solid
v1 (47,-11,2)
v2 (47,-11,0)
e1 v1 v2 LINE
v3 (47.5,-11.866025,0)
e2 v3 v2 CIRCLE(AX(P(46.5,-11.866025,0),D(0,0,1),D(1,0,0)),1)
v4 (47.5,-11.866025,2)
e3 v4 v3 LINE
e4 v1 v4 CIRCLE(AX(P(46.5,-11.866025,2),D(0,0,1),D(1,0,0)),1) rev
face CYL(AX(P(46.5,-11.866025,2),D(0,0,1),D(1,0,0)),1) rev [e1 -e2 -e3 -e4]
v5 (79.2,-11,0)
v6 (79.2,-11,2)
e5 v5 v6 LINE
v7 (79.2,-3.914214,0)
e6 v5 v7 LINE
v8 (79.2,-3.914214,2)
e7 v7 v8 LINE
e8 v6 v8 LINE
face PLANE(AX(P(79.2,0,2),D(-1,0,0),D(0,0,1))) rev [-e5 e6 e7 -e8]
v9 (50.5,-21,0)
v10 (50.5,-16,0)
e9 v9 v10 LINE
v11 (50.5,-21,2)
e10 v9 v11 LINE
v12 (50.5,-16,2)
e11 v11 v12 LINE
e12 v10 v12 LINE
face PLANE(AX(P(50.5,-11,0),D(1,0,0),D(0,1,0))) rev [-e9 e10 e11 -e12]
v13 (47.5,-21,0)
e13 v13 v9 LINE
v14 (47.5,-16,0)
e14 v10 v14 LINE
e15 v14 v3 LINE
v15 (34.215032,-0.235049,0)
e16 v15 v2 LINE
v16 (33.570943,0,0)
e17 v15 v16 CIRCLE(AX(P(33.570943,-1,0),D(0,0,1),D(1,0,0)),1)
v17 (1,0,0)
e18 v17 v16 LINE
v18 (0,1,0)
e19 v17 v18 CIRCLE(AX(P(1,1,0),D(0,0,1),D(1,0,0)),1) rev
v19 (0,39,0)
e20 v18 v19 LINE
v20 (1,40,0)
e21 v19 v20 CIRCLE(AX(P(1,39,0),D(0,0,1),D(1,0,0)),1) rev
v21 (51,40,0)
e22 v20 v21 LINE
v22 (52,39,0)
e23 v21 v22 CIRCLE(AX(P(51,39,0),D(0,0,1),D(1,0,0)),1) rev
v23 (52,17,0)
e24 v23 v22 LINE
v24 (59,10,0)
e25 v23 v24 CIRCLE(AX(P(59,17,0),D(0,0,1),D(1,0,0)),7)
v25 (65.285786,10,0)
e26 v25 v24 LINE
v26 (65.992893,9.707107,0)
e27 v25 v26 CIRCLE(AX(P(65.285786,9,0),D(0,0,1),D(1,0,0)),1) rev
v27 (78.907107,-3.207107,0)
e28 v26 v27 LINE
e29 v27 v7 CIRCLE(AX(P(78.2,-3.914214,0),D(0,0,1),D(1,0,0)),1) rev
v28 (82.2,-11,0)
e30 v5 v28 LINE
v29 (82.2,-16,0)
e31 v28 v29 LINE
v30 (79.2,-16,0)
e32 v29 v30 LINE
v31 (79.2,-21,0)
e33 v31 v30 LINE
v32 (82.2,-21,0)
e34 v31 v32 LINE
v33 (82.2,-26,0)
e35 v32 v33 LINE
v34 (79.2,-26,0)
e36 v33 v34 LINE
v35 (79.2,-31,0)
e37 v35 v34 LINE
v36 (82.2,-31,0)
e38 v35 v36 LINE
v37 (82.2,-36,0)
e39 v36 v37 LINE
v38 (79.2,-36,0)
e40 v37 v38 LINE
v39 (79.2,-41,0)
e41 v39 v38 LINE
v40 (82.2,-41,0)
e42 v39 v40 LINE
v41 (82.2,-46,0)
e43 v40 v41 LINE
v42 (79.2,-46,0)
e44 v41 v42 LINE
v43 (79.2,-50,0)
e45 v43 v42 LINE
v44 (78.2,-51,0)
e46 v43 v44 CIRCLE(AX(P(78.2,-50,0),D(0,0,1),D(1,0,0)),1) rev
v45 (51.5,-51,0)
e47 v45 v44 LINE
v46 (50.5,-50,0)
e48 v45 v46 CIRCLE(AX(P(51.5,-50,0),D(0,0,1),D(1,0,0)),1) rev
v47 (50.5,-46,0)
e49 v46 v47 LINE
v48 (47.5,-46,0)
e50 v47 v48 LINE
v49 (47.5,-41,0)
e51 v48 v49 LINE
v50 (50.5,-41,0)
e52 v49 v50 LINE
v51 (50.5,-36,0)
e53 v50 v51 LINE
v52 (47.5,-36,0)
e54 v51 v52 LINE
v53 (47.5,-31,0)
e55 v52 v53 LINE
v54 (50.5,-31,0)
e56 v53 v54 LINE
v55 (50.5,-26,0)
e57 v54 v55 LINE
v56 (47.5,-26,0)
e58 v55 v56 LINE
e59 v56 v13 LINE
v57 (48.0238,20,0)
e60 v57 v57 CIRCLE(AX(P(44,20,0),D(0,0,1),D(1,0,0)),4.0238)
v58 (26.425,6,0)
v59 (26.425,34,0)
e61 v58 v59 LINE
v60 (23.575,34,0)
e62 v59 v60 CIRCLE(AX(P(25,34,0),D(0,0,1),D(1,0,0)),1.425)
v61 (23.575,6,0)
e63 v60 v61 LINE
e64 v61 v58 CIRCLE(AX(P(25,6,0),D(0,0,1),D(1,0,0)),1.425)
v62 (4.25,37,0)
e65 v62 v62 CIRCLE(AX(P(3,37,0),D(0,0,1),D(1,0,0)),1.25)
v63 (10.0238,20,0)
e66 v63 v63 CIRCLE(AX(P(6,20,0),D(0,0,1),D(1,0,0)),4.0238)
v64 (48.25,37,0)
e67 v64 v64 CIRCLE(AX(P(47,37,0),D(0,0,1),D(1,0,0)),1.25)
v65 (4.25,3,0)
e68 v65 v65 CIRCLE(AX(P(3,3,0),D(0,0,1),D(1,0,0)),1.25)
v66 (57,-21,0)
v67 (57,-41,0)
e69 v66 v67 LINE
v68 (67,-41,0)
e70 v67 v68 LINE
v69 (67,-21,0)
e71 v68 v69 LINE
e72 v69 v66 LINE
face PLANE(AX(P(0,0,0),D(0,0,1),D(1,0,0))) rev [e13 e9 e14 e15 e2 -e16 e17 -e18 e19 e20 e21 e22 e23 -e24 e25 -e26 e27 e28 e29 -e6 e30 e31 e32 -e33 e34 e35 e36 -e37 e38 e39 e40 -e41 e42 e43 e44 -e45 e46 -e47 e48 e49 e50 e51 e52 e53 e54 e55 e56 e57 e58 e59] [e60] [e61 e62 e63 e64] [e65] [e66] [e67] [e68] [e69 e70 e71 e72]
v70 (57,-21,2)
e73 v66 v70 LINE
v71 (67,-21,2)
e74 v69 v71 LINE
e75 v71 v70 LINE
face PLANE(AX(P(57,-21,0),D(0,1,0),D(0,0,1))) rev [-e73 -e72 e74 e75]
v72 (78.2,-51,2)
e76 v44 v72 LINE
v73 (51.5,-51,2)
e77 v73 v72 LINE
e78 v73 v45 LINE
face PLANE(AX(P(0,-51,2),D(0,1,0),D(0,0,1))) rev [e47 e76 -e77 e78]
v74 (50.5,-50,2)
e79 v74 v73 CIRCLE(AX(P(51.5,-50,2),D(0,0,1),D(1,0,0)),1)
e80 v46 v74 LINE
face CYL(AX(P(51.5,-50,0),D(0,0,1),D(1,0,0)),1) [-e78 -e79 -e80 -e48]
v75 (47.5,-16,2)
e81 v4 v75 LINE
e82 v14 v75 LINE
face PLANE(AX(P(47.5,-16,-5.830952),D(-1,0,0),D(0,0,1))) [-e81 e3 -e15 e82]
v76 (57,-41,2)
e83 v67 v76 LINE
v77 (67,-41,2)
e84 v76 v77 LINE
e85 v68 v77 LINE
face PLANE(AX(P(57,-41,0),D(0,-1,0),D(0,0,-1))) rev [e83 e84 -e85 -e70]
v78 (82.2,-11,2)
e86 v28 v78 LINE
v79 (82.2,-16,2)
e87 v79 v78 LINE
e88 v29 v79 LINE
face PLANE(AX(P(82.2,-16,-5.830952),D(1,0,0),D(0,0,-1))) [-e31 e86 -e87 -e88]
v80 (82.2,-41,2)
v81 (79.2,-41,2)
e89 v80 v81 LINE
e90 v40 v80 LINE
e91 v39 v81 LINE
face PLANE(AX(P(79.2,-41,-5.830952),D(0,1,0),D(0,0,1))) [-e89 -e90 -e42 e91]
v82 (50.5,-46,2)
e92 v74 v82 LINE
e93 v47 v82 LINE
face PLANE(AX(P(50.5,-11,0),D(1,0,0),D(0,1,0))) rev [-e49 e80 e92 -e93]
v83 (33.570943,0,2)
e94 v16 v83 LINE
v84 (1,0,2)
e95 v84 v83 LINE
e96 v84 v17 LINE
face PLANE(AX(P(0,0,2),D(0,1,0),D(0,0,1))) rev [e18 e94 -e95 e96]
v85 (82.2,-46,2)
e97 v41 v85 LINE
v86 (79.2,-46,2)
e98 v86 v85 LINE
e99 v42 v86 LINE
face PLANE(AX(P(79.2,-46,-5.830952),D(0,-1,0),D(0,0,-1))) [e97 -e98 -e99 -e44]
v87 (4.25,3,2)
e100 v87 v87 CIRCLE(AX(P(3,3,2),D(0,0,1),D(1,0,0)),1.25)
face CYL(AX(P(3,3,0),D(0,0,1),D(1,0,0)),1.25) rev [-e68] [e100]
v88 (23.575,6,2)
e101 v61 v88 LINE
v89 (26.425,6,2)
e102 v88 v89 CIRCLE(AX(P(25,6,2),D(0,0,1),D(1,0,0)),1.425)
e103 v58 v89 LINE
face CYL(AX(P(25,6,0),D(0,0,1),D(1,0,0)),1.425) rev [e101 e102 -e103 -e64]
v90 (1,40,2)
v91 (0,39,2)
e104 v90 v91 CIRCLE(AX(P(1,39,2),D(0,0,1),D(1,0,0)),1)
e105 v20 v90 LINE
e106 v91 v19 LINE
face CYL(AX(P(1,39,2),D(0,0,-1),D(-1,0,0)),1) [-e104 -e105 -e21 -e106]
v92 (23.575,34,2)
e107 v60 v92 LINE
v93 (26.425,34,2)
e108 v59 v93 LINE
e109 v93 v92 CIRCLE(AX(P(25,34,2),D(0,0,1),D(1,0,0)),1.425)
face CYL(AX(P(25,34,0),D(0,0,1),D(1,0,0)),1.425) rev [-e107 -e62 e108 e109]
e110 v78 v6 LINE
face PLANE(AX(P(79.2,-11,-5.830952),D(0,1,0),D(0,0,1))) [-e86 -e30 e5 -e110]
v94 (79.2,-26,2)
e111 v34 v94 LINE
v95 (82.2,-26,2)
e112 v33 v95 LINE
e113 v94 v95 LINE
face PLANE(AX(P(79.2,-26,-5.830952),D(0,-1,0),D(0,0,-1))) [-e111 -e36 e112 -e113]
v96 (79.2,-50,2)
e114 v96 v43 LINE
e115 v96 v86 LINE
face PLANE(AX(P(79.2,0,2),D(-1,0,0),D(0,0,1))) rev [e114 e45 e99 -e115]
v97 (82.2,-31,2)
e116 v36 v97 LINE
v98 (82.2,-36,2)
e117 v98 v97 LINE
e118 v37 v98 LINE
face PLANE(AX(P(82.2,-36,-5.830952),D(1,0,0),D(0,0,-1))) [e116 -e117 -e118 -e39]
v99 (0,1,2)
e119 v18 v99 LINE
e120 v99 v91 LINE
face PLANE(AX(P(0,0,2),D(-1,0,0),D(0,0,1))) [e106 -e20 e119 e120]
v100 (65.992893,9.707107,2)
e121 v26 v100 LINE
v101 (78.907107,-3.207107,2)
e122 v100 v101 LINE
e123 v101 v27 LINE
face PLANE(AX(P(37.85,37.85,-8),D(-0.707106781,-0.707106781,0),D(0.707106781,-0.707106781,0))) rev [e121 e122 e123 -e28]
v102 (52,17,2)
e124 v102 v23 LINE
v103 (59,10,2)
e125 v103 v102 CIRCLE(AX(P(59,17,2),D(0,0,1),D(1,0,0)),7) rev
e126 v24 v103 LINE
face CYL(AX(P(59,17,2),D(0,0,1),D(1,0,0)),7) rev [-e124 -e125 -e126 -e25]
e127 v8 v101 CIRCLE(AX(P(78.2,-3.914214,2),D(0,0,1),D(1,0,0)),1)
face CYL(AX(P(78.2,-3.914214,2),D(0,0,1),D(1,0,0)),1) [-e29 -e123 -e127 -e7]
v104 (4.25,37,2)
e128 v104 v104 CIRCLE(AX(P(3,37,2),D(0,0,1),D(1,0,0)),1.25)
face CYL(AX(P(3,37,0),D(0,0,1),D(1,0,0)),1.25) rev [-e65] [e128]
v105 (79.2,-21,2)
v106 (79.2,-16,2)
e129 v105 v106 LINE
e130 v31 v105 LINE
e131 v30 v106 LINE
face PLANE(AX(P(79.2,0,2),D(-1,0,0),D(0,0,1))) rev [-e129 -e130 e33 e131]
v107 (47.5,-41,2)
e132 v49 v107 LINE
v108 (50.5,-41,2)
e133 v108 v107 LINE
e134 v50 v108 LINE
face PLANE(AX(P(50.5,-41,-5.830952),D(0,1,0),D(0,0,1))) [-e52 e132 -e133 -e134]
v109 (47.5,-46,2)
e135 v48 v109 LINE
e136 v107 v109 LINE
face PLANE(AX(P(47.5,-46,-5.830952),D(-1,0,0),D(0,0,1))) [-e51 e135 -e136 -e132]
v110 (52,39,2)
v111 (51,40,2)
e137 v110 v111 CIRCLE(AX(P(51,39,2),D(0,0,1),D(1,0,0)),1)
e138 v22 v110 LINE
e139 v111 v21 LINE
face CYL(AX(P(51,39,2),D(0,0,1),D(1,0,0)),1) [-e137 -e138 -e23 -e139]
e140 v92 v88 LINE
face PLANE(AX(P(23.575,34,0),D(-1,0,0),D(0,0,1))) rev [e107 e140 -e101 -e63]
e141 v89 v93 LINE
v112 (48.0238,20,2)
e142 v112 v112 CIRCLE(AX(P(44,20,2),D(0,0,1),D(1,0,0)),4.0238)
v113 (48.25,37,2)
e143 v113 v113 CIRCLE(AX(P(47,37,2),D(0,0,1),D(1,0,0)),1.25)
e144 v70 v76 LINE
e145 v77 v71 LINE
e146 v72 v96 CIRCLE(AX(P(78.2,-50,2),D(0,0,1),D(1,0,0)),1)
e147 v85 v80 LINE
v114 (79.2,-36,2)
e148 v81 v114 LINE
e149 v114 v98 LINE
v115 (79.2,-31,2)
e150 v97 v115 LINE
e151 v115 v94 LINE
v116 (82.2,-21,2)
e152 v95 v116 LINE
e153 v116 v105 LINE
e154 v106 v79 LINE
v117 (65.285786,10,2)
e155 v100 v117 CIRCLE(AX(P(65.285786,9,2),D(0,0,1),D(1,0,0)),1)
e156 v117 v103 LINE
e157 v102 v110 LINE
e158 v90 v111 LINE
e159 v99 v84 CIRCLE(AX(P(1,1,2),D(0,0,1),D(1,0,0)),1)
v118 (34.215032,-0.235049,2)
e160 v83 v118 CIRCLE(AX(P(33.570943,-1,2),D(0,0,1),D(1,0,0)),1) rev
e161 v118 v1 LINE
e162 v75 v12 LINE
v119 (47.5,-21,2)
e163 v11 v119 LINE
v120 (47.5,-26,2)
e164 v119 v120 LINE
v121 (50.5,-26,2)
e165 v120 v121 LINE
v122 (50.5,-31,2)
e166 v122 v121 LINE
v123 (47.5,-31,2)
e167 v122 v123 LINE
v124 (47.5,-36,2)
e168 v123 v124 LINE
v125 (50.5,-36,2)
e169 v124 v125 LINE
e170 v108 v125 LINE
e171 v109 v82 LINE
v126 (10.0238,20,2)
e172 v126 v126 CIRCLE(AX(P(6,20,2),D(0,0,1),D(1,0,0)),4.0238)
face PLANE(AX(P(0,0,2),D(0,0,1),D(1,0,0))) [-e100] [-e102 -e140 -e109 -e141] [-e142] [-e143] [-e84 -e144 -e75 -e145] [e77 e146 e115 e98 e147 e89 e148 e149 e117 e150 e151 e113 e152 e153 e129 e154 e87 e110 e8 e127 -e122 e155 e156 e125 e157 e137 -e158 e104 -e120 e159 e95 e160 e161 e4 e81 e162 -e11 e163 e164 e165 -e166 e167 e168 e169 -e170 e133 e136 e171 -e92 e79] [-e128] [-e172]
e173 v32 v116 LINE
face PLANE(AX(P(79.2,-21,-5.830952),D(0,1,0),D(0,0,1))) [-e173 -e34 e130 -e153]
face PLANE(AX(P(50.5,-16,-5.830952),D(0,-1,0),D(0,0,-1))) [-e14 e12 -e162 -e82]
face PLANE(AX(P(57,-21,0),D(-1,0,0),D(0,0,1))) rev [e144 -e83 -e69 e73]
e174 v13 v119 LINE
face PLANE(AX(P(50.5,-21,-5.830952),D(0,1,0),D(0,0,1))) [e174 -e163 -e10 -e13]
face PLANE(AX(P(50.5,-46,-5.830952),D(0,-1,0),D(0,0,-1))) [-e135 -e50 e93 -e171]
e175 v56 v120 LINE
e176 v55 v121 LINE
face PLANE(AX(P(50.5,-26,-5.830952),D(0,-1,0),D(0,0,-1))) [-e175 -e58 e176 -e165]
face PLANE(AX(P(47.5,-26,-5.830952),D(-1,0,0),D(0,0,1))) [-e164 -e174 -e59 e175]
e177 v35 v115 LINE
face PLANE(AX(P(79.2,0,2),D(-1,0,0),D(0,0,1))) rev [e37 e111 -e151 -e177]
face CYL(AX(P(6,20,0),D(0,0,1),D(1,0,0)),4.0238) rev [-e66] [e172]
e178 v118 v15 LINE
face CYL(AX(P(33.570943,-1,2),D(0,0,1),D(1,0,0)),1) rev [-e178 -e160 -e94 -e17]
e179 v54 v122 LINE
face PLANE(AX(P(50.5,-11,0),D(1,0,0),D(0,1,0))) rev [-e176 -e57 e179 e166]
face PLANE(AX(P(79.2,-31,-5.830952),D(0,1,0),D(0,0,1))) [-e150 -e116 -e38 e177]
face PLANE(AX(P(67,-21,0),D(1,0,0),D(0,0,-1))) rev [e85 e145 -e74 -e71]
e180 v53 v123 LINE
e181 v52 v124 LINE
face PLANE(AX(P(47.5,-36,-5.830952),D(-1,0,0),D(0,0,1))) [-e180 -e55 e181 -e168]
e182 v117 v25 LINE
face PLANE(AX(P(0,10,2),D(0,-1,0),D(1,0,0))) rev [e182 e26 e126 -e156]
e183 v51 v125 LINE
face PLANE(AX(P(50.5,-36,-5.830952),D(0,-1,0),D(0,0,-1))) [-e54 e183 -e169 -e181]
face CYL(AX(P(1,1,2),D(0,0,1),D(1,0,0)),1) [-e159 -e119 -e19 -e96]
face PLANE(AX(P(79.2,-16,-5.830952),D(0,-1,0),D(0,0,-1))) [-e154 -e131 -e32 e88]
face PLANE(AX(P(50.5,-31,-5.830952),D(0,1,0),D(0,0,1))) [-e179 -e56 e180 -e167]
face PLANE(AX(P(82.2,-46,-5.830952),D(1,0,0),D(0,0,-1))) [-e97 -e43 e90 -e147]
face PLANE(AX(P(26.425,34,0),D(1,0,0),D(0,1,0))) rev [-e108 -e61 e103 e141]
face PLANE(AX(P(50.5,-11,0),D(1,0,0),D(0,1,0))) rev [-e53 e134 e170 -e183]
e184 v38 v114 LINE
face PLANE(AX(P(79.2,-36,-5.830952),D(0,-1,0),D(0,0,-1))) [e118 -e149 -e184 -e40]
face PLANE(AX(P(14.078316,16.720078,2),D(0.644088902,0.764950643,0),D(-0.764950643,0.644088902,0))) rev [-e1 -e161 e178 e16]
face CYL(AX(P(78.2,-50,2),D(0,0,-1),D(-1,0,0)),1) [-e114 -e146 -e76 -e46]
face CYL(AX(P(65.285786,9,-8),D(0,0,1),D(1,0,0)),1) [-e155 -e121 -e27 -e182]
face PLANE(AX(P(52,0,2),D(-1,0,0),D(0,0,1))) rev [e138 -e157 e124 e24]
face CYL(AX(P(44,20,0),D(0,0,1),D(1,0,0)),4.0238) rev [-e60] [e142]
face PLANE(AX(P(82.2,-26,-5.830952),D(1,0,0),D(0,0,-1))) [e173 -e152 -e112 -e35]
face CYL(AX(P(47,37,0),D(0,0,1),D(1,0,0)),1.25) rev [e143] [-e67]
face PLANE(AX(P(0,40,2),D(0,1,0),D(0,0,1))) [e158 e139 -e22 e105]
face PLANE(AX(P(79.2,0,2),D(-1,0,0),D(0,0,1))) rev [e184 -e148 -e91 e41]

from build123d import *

# Parameters (mm, degrees)
PLATE_BODY_DEPTH          = 2
SKETCH2_R                 = 4.0238
SHAFT_BEARINGS_DEPTH      = 95.22122903
SLOT_DEPTH                = 95.22122903
SKETCH5_R                 = 1.25
BOLT_HOLES_DEPTH          = 95.22122903
SKETCH6_W                 = 0.5
SKETCH6_H                 = 40
CUT_EXTRUDE1_DEPTH        = 95.22122903
SKETCH8_W                 = 3
SKETCH8_H                 = 5
FINGER_JOINTS_DEPTH       = 2
SKETCH9_W                 = 10
SKETCH9_H                 = 20
GEAR_HOLE_DEPTH           = 97.756601842
CUT_EXTRUDE3_DEPTH        = 10
F_1MM_FILLETS_GEAR_HOLE_R = 1
F_7MM_FILLET_GEAR_HOLE_R  = 7


with BuildPart() as part:
    # Sketch1 → plate_body (new body)
    with BuildSketch(Plane.XY):
        Polygon((0, 40), (0, 0), (33.935876329, 0), (47, -11), (50, -11), (50, -51), (79.2, -51), (79.2, 10), (52, 10), (52, 40), align=None)
    extrude(amount=PLATE_BODY_DEPTH)

    # Sketch2 → shaft_bearings (cut, through all)
    with BuildSketch(Plane.XY.offset(2)):
        with Locations((6, 20)):
            Circle(SKETCH2_R)
        with Locations((44, 20)):
            Circle(SKETCH2_R)
    extrude(amount=-SHAFT_BEARINGS_DEPTH, mode=Mode.SUBTRACT)

    # Sketch4 → slot (cut, through all)
    with BuildSketch(Plane.XY.offset(2)):
        with BuildLine():
            Line((26.425, 34), (26.425, 6))
            ThreePointArc((26.425, 6), (25, 4.575), (23.575, 6))
            Line((23.575, 6), (23.575, 34))
            ThreePointArc((23.575, 34), (25, 35.425), (26.425, 34))
        make_face()
    extrude(amount=-SLOT_DEPTH, mode=Mode.SUBTRACT)

    # Sketch5 → bolt_holes (cut, through all)
    with BuildSketch(Plane.XY.offset(2)):
        with Locations((3, 37)):
            Circle(SKETCH5_R)
        with Locations((47, 37)):
            Circle(SKETCH5_R)
        with Locations((3, 3)):
            Circle(SKETCH5_R)
    extrude(amount=-BOLT_HOLES_DEPTH, mode=Mode.SUBTRACT)

    # Sketch6 → Cut-Extrude1 (cut, through all)
    with BuildSketch(Plane.XY.offset(2)):
        with Locations((50.25, -31)):
            Rectangle(SKETCH6_W, SKETCH6_H)
    extrude(amount=-CUT_EXTRUDE1_DEPTH, mode=Mode.SUBTRACT)

    # Sketch8 → finger_joints (add)
    with BuildSketch(Plane.XY.offset(2)):
        with Locations((49, -33.5)):
            Rectangle(SKETCH8_W, SKETCH8_H)
        with Locations((49, -43.5)):
            Rectangle(SKETCH8_W, SKETCH8_H)
        with Locations((80.7, -43.5)):
            Rectangle(SKETCH8_W, SKETCH8_H)
        with Locations((80.7, -33.5)):
            Rectangle(SKETCH8_W, SKETCH8_H)
        with Locations((49, -13.5)):
            Rectangle(SKETCH8_W, SKETCH8_H)
        with Locations((49, -23.5)):
            Rectangle(SKETCH8_W, SKETCH8_H)
        with Locations((80.7, -23.5)):
            Rectangle(SKETCH8_W, SKETCH8_H)
        with Locations((80.7, -13.5)):
            Rectangle(SKETCH8_W, SKETCH8_H)
    extrude(amount=-FINGER_JOINTS_DEPTH)

    # Sketch9 → gear_hole (cut, through all)
    with BuildSketch(Plane.XY.offset(2)):
        with Locations((62, -31)):
            Rectangle(SKETCH9_W, SKETCH9_H)
    extrude(amount=-GEAR_HOLE_DEPTH, mode=Mode.SUBTRACT)

    # Sketch12 → Cut-Extrude3 (cut)
    with BuildSketch(Plane.XY.offset(2)):
        Polygon((79.2, 10), (79.2, -3.5), (65.7, 10), align=None)
    extrude(amount=-CUT_EXTRUDE3_DEPTH, mode=Mode.SUBTRACT)

    # 1mm_fillets_gear_hole
    # the kernel refuses this fillet: 1 mm, written as the material it adds along each edge
    with BuildSketch(Plane(origin=(33.935876329, 0, 0), x_dir=(-1, 0, 0), z_dir=(0, 0, 1))) as f_1mm_fillets_gear_hole_piece_1:
        with BuildLine():
            CenterArc((F_1MM_FILLETS_GEAR_HOLE_R * 0.364933095837, F_1MM_FILLETS_GEAR_HOLE_R), F_1MM_FILLETS_GEAR_HOLE_R, 229.902601193, 40.097398807)
            Line((-F_1MM_FILLETS_GEAR_HOLE_R * 0.279155806295, F_1MM_FILLETS_GEAR_HOLE_R * 0.23504935705), (0, 0))
            Line((0, 0), (F_1MM_FILLETS_GEAR_HOLE_R * 0.364933095837, 0))
        make_face()
    extrude(amount=2)
    with BuildSketch(Plane(origin=(47.5, -11, 2), x_dir=(0, -1, 0), z_dir=(0, 0, -1))) as f_1mm_fillets_gear_hole_piece_2:
        with BuildLine():
            CenterArc((0.866025404, 1), F_1MM_FILLETS_GEAR_HOLE_R, 210, 60)
            Line((0, 0.5), (0, 0))
            Line((0, 0), (0.866025404, 0))
        make_face()
    extrude(amount=2)
    # the kernel refuses this fillet: 1 mm, written as the material it takes off along each edge
    with BuildSketch(Plane(origin=(0, 0, -2.5), x_dir=(0, 1, 0), z_dir=(0, 0, 1)), Plane(origin=(50.5, -51, 4.5), x_dir=(1, 0, 0), z_dir=(0, 0, -1))) as f_1mm_fillets_gear_hole_2_piece_1:
        with BuildLine():
            CenterArc((F_1MM_FILLETS_GEAR_HOLE_R, -F_1MM_FILLETS_GEAR_HOLE_R), F_1MM_FILLETS_GEAR_HOLE_R, 90, 90)
            Line((0, -F_1MM_FILLETS_GEAR_HOLE_R), (0, 0))
            Line((0, 0), (F_1MM_FILLETS_GEAR_HOLE_R, 0))
        make_face()
    extrude(amount=7, mode=Mode.SUBTRACT)
    with BuildSketch(Plane(origin=(0, 40, -2.5), x_dir=(0, -1, 0), z_dir=(0, 0, 1)), Plane(origin=(52, 40, -2.5), x_dir=(-1, 0, 0), z_dir=(0, 0, 1)), Plane(origin=(79.2, -51, -2.5), x_dir=(0, 1, 0), z_dir=(0, 0, 1))) as f_1mm_fillets_gear_hole_2_piece_2:
        with BuildLine():
            CenterArc((F_1MM_FILLETS_GEAR_HOLE_R, F_1MM_FILLETS_GEAR_HOLE_R), F_1MM_FILLETS_GEAR_HOLE_R, 180, 90)
            Line((0, F_1MM_FILLETS_GEAR_HOLE_R), (0, 0))
            Line((0, 0), (F_1MM_FILLETS_GEAR_HOLE_R, 0))
        make_face()
    extrude(amount=7, mode=Mode.SUBTRACT)
    with BuildSketch(Plane(origin=(79.2, -3.5, 3.035533906), x_dir=(-0.7071067811865523, 0.7071067811865427, 0), z_dir=(0, 0, -1)), Plane(origin=(65.7, 10, 3.035533906), x_dir=(-1, 0, 0), z_dir=(0, 0, -1))) as f_1mm_fillets_gear_hole_2_piece_3:
        with BuildLine():
            CenterArc((F_1MM_FILLETS_GEAR_HOLE_R * 0.414213562373, -F_1MM_FILLETS_GEAR_HOLE_R), F_1MM_FILLETS_GEAR_HOLE_R, 90, 45)
            Line((-F_1MM_FILLETS_GEAR_HOLE_R * 0.292893218813, -F_1MM_FILLETS_GEAR_HOLE_R * 0.292893218813), (0, 0))
            Line((0, 0), (F_1MM_FILLETS_GEAR_HOLE_R * 0.414213562373, 0))
        make_face()
    extrude(amount=4.071067812, mode=Mode.SUBTRACT)

    # 7mm_fillet_gear_hole
    f_7mm_fillet_gear_hole_edges = [part.edges().sort_by_distance(p)[0] for p in [
        (52, 10, 1),
    ]]
    fillet(f_7mm_fillet_gear_hole_edges, radius=F_7MM_FILLET_GEAR_HOLE_R)


solid = part.part
